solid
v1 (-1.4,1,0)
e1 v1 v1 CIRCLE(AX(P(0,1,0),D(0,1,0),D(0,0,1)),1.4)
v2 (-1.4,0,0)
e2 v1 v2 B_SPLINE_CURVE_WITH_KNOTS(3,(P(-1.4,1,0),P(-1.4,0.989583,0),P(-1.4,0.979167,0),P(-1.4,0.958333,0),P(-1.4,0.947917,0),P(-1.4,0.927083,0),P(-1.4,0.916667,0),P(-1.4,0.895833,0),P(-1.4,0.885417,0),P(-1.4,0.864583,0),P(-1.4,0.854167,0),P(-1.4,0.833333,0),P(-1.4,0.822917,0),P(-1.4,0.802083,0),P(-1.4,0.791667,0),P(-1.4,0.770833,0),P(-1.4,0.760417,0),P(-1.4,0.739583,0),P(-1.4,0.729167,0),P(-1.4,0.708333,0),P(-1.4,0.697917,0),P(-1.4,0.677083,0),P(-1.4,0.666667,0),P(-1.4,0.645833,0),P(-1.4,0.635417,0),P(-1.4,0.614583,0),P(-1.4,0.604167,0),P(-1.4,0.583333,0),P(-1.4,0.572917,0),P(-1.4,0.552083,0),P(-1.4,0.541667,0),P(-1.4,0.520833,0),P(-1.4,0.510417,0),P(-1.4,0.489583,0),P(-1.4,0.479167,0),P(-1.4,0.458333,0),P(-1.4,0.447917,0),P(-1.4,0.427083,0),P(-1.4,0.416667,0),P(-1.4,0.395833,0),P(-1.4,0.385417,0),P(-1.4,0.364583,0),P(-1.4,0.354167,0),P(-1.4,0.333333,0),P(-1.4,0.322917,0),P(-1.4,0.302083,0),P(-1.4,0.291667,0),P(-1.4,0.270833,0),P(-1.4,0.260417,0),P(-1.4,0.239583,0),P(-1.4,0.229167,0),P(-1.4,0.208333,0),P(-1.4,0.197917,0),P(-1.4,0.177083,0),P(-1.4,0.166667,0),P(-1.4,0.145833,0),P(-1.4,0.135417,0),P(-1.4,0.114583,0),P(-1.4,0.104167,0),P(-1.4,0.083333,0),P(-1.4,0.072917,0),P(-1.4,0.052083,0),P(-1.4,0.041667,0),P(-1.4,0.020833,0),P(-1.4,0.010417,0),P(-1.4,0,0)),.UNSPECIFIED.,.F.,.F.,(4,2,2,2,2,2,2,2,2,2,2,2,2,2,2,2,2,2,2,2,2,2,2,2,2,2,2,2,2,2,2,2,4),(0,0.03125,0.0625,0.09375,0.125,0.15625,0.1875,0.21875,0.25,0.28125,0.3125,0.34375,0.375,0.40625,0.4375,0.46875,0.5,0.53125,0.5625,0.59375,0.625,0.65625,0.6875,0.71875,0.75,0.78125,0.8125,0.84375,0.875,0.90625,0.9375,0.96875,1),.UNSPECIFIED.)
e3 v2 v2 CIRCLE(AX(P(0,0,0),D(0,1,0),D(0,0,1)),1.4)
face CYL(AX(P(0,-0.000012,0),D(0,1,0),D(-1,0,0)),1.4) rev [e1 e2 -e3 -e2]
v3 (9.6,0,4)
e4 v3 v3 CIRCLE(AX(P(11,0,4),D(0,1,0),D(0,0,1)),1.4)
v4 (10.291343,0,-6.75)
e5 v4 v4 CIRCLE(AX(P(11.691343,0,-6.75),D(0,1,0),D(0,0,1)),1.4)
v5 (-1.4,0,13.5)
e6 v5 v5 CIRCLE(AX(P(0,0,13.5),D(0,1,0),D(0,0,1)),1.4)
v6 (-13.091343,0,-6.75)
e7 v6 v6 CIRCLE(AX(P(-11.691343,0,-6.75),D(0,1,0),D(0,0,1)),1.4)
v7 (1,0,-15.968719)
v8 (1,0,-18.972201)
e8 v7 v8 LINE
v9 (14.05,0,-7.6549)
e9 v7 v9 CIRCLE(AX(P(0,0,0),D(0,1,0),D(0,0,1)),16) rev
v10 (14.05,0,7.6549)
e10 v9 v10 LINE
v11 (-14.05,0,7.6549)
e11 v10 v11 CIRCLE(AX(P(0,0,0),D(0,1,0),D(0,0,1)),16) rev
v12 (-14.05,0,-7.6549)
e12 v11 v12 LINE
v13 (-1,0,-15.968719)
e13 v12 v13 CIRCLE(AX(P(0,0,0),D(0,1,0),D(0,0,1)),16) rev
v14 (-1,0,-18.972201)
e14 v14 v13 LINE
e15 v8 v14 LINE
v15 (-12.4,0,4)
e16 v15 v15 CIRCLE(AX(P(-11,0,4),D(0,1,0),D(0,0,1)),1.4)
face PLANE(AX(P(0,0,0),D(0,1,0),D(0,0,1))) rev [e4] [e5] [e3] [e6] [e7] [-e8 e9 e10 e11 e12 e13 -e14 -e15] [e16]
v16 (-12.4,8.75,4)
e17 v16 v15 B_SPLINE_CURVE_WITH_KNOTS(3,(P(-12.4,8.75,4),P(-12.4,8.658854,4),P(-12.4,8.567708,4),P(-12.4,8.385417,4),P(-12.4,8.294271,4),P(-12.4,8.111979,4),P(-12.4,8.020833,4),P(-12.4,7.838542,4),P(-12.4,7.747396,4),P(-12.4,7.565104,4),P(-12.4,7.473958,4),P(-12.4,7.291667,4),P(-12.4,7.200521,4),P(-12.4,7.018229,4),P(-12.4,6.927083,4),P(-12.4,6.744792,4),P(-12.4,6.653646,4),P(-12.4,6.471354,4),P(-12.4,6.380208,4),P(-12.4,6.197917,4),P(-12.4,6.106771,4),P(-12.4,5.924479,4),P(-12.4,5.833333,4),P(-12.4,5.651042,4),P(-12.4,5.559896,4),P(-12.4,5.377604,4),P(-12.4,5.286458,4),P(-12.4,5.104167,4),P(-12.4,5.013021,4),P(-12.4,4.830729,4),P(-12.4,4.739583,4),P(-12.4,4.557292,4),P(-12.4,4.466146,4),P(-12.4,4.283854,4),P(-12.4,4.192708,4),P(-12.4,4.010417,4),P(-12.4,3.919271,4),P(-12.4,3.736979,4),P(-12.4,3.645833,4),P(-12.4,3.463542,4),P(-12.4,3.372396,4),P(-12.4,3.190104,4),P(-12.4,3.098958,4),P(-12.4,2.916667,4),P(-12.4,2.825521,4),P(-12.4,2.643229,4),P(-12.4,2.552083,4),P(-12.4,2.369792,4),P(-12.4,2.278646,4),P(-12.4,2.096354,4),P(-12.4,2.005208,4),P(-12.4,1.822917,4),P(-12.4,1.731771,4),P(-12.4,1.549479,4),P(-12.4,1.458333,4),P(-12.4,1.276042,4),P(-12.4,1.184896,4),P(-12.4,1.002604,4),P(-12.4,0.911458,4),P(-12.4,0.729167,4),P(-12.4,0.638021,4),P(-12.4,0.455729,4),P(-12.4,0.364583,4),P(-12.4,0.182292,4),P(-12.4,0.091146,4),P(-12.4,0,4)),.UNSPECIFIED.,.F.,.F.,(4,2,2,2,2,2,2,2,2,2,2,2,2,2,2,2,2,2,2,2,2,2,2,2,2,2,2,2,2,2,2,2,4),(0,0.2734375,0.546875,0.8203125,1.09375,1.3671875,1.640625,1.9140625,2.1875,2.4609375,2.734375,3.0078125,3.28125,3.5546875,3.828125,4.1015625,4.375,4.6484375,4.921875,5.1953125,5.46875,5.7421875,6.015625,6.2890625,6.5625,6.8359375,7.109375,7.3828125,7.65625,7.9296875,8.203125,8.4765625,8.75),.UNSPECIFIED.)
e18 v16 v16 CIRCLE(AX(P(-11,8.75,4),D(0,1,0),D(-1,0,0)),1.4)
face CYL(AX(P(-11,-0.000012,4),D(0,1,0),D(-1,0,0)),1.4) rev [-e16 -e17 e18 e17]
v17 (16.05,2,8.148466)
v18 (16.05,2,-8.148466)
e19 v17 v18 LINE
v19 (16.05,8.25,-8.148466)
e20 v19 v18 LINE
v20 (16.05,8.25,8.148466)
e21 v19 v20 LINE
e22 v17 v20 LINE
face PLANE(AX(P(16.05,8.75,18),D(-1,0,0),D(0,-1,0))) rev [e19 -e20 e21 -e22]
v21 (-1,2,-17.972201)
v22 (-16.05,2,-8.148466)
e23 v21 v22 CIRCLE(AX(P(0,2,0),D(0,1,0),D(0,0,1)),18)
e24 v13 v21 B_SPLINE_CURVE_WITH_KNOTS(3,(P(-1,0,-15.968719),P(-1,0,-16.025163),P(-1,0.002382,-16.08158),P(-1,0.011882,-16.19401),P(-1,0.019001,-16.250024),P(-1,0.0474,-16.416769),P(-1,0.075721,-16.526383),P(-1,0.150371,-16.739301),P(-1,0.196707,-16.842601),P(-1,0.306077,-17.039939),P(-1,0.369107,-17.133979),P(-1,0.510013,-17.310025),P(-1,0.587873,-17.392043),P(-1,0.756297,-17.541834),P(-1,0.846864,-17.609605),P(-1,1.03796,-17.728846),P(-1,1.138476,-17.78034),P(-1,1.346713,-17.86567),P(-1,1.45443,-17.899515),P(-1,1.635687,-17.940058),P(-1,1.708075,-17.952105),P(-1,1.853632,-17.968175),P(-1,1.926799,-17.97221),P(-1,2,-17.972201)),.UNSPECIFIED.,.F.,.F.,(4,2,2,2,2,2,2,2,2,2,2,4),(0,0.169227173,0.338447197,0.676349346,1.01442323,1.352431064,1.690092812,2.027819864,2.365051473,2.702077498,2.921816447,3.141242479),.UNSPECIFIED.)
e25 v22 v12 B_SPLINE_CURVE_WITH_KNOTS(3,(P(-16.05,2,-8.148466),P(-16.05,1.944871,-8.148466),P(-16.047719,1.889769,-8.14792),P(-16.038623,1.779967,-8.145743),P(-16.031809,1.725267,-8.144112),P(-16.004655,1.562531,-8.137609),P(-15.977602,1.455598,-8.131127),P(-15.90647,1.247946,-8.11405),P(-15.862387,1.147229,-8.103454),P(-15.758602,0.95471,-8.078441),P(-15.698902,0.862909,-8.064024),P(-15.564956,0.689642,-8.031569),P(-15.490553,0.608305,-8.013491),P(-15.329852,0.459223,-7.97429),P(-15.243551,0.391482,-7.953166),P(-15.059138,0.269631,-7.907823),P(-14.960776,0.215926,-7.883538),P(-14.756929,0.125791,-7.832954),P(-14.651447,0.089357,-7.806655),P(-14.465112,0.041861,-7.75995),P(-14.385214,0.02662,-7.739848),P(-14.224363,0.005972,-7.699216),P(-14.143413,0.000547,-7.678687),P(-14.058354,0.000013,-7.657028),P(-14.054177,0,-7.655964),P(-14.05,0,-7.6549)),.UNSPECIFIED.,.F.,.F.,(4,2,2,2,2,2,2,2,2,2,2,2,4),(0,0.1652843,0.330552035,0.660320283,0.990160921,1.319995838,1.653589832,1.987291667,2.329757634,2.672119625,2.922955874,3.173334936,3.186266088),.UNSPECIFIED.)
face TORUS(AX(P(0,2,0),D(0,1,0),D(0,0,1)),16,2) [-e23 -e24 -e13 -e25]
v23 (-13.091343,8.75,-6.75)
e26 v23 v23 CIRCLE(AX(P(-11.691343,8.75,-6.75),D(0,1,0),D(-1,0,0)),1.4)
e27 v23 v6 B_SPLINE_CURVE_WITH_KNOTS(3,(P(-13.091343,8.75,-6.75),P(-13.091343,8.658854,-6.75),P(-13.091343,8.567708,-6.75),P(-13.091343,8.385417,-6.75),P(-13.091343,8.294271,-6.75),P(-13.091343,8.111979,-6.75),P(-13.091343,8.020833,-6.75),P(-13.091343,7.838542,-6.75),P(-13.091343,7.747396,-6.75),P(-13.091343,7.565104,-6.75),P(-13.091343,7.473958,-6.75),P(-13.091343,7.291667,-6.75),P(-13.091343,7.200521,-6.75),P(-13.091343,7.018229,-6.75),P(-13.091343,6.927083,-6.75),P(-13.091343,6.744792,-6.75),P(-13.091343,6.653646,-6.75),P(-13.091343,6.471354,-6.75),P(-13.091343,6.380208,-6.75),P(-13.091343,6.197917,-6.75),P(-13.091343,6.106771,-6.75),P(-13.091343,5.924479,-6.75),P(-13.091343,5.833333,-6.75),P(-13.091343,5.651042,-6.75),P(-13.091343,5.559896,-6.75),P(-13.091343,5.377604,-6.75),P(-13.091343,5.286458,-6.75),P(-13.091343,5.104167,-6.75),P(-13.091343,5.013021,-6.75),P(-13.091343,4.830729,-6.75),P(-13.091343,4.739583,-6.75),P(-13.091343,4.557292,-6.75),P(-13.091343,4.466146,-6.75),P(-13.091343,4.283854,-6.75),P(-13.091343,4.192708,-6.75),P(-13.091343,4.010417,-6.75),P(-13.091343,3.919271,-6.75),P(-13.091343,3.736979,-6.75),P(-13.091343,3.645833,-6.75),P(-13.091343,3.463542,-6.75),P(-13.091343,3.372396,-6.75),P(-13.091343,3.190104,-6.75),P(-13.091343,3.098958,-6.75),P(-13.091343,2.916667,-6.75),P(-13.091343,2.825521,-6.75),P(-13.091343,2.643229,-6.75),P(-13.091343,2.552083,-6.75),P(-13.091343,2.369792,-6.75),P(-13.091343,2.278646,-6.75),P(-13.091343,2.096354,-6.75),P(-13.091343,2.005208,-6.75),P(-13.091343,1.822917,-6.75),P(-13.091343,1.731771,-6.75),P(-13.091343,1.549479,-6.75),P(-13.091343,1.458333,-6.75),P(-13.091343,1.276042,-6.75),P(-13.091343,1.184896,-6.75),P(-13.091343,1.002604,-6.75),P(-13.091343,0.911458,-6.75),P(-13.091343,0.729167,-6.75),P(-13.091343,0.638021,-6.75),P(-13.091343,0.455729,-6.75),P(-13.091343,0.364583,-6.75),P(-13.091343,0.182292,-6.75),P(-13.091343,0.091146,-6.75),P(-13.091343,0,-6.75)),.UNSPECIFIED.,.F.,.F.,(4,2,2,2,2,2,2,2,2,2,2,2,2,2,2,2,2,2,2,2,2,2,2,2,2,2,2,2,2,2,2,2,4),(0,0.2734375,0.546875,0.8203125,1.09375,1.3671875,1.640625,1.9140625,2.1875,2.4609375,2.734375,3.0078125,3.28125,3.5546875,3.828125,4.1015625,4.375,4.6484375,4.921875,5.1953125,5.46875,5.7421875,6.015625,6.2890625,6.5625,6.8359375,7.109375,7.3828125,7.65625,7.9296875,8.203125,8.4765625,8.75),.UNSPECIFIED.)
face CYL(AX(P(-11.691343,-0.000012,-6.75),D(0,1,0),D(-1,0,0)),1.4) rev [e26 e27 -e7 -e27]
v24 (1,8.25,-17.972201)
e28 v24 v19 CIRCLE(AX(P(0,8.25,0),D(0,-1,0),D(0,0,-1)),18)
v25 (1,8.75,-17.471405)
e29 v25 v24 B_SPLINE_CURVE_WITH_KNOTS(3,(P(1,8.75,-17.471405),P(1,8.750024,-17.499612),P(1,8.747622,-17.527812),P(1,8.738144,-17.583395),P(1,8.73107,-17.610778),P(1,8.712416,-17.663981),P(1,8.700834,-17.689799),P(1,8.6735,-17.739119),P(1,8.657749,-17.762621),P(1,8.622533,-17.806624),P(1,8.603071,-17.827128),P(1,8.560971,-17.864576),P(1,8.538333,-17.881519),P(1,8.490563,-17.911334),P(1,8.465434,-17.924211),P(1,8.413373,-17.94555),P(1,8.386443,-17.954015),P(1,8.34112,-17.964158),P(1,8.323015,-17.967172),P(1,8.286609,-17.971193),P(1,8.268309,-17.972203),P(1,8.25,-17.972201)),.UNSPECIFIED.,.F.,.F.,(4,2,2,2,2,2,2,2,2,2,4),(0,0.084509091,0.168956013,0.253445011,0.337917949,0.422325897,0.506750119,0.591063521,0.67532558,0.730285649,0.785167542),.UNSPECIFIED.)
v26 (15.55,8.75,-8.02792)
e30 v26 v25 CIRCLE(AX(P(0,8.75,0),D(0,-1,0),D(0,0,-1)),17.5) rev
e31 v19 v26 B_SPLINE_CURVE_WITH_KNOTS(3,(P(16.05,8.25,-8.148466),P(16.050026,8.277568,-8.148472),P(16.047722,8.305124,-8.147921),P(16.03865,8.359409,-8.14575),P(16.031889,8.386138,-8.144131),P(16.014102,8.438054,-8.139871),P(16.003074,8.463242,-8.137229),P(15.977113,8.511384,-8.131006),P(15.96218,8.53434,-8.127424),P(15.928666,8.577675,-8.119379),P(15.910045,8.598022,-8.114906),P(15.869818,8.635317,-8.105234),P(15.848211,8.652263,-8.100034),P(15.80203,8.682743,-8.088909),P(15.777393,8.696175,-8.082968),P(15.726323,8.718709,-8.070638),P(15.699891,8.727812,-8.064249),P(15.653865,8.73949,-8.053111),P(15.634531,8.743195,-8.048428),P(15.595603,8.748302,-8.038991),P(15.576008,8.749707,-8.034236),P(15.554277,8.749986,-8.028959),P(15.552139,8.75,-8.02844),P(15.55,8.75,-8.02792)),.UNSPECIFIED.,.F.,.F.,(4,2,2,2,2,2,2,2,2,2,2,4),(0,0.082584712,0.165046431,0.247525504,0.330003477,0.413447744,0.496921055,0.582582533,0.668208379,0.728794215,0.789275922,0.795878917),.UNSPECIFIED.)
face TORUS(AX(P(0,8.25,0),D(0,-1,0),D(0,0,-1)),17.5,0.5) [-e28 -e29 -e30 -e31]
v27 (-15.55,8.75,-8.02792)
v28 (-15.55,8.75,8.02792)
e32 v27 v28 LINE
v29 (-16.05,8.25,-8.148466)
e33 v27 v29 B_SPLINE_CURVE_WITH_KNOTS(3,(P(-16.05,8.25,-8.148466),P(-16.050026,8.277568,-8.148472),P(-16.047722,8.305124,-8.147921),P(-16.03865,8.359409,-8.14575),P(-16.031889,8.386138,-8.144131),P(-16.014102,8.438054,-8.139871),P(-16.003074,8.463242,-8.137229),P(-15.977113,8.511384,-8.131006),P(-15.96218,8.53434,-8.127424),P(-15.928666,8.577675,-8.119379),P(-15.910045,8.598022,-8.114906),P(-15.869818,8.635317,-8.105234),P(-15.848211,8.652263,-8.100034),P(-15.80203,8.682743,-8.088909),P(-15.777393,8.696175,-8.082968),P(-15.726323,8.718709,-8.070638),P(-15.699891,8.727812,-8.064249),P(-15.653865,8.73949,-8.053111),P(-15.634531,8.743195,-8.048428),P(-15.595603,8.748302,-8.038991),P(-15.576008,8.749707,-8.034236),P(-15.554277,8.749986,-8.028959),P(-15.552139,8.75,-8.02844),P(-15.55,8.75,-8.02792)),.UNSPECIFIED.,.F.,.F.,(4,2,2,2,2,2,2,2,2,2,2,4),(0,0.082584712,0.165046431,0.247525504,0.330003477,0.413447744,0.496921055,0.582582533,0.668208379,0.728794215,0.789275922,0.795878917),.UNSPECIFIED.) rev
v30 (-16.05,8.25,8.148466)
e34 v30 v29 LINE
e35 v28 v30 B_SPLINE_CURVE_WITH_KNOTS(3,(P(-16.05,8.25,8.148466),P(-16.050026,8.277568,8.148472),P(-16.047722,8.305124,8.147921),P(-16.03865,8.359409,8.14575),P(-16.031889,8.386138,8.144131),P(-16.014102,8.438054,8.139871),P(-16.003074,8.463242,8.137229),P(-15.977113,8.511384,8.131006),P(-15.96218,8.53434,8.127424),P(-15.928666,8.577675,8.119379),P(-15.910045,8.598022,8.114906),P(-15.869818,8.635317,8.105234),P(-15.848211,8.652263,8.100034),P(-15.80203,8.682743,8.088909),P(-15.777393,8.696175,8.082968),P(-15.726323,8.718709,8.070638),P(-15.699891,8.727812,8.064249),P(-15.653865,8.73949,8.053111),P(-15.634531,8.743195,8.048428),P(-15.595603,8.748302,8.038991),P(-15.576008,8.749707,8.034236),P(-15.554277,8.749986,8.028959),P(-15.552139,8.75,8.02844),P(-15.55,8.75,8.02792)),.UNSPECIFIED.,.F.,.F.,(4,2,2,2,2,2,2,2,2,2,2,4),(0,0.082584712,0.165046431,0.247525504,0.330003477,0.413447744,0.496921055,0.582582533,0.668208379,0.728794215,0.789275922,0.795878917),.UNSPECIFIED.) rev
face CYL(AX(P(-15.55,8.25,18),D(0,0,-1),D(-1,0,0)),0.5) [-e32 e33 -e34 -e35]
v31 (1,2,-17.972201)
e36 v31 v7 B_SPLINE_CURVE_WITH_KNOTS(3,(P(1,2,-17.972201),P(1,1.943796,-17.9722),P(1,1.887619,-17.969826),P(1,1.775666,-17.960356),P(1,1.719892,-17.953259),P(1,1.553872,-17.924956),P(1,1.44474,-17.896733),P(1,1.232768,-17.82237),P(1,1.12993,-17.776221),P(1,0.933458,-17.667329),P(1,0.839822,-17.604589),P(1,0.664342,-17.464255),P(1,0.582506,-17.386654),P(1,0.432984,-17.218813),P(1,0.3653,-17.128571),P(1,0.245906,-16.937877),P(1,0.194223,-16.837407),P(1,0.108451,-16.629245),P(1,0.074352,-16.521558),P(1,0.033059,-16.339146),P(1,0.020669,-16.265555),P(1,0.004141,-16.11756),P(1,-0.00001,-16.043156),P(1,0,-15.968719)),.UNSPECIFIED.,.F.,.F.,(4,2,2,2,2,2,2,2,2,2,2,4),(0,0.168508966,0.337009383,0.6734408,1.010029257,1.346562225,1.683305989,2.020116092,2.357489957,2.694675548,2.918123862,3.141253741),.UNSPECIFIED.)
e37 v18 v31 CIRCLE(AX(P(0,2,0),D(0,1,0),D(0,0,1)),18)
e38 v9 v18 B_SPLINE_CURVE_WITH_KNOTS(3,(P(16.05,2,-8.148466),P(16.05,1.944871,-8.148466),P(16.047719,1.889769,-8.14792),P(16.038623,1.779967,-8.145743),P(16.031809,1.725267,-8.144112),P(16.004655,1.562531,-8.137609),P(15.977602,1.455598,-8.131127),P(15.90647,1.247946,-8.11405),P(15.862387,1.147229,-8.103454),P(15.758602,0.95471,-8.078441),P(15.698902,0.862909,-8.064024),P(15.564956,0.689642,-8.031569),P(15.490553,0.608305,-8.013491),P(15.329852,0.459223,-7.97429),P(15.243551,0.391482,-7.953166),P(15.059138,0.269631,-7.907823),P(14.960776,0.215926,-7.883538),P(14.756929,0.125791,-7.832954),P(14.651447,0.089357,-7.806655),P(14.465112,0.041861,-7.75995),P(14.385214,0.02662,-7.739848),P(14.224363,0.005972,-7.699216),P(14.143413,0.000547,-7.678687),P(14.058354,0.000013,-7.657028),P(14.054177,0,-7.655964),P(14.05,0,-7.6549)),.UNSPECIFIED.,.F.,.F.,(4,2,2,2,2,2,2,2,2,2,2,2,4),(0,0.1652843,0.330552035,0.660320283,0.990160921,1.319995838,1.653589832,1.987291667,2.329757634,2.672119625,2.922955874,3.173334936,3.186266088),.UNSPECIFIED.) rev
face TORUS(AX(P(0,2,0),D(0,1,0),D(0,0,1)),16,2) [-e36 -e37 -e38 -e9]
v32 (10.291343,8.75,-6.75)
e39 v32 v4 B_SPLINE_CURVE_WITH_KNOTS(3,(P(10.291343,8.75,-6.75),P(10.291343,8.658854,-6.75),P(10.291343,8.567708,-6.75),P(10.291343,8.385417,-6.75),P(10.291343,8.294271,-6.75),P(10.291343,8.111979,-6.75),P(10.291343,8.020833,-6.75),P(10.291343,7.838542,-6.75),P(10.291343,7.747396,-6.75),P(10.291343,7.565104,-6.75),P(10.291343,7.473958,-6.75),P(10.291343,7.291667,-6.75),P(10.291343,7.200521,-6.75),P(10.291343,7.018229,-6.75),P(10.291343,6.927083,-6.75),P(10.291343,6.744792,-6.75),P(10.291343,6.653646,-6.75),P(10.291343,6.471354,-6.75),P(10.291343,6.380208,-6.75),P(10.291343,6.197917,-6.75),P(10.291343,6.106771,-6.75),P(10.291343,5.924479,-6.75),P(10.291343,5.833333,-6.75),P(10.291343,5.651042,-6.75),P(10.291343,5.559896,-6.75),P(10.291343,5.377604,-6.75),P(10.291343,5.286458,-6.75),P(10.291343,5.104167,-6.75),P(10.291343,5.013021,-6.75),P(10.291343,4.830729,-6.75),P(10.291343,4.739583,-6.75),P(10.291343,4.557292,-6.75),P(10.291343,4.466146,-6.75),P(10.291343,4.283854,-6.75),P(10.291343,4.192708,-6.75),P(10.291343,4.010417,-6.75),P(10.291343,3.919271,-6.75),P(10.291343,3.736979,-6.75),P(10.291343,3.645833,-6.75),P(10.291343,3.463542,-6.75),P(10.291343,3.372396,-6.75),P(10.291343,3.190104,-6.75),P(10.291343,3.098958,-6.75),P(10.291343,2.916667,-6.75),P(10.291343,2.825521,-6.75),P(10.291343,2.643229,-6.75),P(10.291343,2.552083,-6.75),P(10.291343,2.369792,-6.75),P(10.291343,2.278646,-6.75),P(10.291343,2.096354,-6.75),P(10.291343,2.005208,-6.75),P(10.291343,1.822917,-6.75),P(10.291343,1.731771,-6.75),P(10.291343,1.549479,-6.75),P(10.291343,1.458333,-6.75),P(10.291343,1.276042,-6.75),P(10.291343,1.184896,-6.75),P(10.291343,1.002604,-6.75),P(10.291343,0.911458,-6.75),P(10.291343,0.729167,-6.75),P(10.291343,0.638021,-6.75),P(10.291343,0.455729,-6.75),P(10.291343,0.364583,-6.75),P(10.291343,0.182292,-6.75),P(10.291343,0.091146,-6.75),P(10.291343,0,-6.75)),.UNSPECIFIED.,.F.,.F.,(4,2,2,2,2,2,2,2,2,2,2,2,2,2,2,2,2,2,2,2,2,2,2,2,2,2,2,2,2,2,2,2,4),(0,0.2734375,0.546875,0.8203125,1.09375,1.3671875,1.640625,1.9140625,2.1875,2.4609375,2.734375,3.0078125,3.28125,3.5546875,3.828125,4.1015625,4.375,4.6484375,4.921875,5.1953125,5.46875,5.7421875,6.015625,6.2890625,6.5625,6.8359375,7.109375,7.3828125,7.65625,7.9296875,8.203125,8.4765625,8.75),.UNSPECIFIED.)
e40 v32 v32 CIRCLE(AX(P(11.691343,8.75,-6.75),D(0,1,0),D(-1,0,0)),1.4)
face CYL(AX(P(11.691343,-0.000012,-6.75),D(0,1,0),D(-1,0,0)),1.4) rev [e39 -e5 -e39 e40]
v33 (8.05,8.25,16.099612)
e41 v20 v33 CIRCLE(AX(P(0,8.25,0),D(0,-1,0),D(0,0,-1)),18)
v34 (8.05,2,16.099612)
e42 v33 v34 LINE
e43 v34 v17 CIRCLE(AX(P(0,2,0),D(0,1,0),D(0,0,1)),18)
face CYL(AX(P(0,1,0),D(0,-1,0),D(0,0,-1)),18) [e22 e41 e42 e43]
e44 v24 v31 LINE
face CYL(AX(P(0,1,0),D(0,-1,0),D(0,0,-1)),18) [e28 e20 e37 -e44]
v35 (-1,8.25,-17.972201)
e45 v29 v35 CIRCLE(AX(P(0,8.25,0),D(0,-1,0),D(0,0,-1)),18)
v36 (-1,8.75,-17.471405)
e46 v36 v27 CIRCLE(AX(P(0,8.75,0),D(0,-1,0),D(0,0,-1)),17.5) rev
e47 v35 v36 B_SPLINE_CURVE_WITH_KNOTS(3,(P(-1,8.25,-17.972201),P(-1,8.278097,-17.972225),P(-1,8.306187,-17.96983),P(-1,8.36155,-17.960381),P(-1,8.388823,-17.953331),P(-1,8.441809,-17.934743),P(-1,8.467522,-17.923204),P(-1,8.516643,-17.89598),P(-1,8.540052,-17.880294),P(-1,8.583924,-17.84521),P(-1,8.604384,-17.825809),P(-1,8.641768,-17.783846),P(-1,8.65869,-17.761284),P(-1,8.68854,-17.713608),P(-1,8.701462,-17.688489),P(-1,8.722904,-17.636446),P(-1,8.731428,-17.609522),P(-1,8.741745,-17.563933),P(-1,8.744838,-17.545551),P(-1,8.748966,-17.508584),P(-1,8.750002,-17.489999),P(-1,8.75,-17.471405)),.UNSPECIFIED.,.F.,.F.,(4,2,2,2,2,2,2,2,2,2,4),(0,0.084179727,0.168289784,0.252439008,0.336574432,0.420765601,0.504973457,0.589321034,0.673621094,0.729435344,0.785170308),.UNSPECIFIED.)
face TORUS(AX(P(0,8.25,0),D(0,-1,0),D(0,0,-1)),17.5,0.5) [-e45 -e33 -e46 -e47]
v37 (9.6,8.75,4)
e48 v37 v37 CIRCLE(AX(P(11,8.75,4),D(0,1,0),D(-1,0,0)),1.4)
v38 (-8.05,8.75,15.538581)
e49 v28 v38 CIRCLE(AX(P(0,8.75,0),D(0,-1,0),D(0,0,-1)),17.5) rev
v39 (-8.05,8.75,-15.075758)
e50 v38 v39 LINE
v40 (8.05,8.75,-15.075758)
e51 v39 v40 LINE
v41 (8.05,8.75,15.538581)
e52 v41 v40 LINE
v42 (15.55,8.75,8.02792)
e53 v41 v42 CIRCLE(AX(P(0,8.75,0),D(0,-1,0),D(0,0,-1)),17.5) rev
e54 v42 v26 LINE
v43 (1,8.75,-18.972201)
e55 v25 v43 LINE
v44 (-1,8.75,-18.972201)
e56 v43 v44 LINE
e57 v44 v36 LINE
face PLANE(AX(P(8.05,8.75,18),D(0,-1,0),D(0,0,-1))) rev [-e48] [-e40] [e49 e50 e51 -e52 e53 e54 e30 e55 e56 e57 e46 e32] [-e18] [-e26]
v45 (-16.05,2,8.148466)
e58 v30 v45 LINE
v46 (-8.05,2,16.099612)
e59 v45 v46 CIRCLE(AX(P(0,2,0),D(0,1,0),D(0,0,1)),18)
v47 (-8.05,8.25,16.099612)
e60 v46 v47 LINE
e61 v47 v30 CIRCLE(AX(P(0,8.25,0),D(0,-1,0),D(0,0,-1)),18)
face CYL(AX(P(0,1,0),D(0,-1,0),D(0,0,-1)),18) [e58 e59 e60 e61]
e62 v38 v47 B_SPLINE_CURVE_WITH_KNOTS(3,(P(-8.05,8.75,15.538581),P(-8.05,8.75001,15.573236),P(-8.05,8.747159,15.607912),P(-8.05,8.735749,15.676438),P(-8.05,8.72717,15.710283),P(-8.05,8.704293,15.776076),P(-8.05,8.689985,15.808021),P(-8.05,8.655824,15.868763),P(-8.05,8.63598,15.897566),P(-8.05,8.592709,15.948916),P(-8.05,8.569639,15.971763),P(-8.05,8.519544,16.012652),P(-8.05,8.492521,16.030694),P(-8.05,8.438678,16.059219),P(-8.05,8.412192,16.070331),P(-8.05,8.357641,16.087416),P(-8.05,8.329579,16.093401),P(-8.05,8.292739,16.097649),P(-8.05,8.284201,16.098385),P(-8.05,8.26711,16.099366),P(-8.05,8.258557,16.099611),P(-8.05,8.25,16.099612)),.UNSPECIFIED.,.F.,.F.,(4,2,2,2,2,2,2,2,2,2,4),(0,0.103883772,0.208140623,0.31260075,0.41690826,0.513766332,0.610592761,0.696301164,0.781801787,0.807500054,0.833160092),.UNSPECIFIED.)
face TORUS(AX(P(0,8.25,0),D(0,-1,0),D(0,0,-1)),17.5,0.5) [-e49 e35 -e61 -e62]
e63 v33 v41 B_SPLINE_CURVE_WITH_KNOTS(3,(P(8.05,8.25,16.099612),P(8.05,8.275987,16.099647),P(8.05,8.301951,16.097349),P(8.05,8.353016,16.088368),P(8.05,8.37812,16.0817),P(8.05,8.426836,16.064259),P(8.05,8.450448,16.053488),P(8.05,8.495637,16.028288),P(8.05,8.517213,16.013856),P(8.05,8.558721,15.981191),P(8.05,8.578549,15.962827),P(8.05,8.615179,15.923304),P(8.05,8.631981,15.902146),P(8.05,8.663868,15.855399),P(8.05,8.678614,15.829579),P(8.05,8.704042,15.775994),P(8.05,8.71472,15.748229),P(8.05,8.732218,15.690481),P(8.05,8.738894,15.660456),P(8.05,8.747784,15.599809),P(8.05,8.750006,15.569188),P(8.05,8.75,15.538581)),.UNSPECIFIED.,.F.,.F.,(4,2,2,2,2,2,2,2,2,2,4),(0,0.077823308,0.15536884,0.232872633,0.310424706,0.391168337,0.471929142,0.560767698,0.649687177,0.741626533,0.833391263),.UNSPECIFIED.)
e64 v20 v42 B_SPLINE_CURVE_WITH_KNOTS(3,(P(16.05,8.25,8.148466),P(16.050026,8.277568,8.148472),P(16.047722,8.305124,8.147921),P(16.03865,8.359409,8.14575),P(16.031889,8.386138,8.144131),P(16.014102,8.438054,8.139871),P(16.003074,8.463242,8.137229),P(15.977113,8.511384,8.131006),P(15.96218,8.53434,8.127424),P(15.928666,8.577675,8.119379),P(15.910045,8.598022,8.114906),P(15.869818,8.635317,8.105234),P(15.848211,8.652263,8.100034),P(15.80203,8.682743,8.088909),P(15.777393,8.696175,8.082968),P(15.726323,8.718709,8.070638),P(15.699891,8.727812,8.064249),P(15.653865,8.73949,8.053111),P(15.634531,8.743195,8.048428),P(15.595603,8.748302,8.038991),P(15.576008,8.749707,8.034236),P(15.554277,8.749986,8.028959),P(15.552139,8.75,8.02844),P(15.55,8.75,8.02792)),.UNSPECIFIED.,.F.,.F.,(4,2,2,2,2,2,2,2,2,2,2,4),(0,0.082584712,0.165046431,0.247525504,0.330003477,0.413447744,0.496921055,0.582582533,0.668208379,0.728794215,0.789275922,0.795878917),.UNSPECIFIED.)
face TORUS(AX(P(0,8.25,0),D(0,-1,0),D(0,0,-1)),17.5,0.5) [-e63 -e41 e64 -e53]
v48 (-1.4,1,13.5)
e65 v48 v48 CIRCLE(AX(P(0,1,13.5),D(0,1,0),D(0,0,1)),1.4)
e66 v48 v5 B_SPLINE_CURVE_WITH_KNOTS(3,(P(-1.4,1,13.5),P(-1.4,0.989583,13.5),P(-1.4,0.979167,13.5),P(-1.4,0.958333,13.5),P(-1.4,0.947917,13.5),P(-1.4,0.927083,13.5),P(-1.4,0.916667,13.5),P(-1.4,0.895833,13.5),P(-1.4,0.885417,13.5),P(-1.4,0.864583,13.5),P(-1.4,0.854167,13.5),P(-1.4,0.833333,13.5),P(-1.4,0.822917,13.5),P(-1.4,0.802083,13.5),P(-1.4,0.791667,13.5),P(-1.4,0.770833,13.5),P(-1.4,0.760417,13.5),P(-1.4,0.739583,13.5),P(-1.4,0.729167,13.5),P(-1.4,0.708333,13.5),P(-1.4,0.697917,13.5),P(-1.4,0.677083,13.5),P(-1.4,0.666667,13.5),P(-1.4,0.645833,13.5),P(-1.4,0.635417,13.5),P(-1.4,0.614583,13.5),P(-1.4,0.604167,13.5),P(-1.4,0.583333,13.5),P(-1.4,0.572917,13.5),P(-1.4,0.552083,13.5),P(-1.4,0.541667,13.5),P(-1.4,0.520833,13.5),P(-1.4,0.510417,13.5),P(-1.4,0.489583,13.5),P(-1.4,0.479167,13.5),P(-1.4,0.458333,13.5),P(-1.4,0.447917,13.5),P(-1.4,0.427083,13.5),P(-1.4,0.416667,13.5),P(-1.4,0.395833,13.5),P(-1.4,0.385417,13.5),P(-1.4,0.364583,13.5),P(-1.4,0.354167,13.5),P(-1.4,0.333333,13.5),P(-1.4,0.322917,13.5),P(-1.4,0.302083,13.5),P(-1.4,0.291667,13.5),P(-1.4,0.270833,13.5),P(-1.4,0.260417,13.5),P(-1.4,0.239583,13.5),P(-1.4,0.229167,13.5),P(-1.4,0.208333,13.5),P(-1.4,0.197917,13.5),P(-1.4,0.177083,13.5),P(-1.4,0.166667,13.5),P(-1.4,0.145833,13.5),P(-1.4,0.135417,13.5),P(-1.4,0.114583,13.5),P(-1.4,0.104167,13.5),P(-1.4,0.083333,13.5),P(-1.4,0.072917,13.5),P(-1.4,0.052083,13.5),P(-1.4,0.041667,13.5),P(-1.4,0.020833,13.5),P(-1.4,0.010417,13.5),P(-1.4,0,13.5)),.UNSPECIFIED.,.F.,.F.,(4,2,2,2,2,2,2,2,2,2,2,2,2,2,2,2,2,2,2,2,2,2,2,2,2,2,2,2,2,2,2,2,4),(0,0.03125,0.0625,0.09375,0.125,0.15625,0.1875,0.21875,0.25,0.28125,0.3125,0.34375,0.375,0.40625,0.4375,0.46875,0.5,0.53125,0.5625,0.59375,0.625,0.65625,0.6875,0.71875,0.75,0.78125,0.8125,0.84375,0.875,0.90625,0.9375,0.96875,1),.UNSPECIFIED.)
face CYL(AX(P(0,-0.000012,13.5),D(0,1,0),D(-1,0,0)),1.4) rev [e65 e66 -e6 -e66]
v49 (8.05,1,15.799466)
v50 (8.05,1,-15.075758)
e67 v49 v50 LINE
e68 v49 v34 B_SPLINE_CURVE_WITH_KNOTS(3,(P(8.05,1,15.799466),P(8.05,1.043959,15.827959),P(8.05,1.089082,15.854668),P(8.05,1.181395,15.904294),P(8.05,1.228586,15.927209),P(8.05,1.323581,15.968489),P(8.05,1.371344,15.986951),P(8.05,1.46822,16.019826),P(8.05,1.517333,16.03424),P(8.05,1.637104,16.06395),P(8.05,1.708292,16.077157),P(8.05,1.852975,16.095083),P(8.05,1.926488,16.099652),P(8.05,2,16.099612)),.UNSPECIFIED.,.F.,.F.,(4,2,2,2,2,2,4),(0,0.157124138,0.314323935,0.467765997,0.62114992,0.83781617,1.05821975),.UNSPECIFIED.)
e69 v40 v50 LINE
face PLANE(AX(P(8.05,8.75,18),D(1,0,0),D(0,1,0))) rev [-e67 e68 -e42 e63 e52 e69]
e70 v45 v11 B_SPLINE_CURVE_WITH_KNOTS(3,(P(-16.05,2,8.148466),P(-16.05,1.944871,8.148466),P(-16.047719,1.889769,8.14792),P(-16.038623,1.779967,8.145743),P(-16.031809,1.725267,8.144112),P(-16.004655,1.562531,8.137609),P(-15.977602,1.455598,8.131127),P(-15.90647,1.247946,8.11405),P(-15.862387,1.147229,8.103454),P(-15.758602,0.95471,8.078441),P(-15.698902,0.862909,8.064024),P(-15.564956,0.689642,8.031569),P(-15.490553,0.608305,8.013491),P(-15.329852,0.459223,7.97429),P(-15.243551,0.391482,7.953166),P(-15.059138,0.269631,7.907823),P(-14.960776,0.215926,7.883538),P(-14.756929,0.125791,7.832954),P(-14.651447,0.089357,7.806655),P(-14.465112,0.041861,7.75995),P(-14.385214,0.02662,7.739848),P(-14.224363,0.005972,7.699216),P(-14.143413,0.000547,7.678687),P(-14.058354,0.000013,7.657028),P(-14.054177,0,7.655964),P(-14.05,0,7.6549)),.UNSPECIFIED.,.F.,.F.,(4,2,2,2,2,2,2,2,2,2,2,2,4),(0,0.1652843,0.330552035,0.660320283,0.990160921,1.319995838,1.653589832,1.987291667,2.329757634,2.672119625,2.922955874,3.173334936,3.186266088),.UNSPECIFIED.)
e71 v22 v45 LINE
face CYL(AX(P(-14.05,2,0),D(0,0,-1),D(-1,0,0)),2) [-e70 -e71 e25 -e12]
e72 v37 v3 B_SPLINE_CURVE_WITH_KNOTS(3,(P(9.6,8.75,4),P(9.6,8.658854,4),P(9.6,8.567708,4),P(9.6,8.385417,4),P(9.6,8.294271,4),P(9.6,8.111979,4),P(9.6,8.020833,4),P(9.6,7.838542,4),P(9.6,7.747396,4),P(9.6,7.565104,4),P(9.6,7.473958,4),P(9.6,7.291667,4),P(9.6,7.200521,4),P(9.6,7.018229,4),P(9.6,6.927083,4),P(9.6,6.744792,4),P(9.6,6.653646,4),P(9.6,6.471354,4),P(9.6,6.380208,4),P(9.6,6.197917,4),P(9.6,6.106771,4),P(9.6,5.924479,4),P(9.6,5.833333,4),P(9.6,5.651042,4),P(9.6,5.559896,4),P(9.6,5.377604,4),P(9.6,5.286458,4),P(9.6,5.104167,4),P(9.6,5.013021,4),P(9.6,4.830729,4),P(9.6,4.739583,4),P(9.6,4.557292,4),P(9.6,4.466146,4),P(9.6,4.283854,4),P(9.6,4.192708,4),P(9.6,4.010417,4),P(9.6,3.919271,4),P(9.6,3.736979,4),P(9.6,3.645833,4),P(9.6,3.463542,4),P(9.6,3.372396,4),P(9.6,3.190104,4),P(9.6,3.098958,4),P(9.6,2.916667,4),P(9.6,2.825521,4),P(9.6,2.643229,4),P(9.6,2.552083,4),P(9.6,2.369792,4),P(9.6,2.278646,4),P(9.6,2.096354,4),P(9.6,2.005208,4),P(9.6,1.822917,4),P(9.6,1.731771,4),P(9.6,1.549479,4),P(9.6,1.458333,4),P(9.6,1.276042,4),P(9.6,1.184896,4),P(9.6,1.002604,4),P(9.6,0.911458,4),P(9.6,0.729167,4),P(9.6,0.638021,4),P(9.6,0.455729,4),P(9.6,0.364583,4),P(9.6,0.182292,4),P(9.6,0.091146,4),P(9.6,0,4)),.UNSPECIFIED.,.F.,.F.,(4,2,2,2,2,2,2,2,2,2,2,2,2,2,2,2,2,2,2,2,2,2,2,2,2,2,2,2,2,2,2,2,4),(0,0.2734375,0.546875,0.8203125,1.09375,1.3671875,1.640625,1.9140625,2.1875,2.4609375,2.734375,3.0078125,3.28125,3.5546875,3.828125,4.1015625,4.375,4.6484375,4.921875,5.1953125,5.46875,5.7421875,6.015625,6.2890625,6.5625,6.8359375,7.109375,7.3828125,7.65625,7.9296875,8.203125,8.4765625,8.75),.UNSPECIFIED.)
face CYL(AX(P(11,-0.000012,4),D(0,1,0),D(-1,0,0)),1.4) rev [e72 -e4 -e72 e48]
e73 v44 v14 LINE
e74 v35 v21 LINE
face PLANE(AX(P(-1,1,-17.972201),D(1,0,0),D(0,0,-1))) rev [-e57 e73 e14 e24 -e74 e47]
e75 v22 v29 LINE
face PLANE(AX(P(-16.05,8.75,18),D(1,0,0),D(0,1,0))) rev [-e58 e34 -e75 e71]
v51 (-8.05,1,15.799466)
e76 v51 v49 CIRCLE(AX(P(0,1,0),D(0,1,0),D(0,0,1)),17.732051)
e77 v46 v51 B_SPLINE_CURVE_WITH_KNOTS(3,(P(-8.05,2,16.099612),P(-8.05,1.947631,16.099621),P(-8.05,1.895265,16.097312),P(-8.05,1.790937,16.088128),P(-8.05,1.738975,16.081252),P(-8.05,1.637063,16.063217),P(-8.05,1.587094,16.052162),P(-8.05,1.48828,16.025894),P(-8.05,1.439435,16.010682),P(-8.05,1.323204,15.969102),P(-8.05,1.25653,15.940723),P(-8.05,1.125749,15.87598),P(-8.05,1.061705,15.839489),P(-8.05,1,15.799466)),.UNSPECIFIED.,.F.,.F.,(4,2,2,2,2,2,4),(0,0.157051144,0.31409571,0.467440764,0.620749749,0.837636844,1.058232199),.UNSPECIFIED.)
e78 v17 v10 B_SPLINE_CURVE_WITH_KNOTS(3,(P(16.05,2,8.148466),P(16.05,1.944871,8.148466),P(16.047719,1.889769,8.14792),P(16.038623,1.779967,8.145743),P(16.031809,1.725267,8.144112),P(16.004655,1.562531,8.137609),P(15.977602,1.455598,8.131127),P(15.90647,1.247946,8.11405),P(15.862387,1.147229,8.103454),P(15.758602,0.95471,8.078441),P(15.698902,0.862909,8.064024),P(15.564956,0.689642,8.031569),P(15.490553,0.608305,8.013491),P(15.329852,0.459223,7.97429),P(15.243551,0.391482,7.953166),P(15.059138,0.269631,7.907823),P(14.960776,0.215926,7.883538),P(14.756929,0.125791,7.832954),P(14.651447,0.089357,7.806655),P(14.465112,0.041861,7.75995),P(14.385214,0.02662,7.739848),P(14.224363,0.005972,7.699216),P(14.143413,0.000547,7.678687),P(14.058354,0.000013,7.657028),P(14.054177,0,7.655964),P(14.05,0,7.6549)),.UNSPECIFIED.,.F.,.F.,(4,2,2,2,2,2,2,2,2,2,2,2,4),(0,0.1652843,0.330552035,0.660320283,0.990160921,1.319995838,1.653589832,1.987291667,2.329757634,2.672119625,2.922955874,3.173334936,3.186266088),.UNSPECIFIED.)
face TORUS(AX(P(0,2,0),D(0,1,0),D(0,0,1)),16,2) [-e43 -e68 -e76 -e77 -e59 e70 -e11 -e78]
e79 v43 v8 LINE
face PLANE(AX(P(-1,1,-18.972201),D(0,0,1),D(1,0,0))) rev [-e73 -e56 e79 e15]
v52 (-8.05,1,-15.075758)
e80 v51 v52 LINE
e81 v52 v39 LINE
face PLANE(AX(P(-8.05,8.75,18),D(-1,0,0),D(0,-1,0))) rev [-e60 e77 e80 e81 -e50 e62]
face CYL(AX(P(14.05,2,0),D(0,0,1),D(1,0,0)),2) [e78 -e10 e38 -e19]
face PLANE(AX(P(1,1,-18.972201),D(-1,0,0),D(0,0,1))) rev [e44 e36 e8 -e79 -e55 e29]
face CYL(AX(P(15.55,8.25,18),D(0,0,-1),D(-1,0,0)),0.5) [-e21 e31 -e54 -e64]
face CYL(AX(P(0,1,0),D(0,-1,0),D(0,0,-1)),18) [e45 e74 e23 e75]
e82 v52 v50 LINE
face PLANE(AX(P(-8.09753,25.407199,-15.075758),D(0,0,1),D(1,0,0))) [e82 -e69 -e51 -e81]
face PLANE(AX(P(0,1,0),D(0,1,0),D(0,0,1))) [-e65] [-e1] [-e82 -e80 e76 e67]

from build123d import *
from build123d.topology import SkipClean

# Parameters (mm, degrees)
BOSS_EXTRUDE1_DEPTH      = 1
BOSS_EXTRUDE2_DEPTH      = 18
BOSS_EXTRUDE2_DEPTH_BACK = 18.972201
SKETCH2_W                = 8
SKETCH2_H                = 7.75
SKETCH3_R                = 59.910539196
CUT_EXTRUDE1_DEPTH       = 28.577289765
CUT_EXTRUDE2_DEPTH       = 28.577289597
CUT_EXTRUDE2_DEPTH_BACK  = 28.577289597
SKETCH5_R                = 1.4
BOSS_EXTRUDE3_DEPTH      = 8.75
CUT_EXTRUDE3_DEPTH       = 28.276489905
FILLET1_R                = 2
FILLET2_R                = 0.5


with BuildPart() as part:
    # Sketch1 → Boss-Extrude1 (new body)
    with BuildSketch(Plane(origin=(0, 0, 0), x_dir=(1, 0, 0), z_dir=(0, 1, 0))):
        with BuildLine():
            Line((-1, 17.972200756), (-1, 18.972200756))
            Line((-1, 18.972200756), (1, 18.972200756))
            Line((1, 18.972200756), (1, 17.972200756))
            ThreePointArc((1, 17.972200756), (0, -18), (-1, 17.972200756))
        make_face()
    extrude(amount=BOSS_EXTRUDE1_DEPTH)

    # Sketch2 → Boss-Extrude2 (add, two sides: drawn at the far end of the back side and taken through both)
    with BuildSketch(Plane.XY.offset(-BOSS_EXTRUDE2_DEPTH_BACK)):
        with Locations((-12.05, 4.875)):
            Rectangle(SKETCH2_W, SKETCH2_H)
        with Locations((12.05, 4.875)):
            Rectangle(SKETCH2_W, SKETCH2_H)
    extrude(amount=BOSS_EXTRUDE2_DEPTH + BOSS_EXTRUDE2_DEPTH_BACK)

    # Sketch3 → Cut-Extrude1 (cut, through all)
    with BuildSketch(Plane.XZ):
        Circle(SKETCH3_R)
        with BuildLine():
            Line((-1, -17.972200756), (-1, -18.972200756))
            Line((-1, -18.972200756), (1, -18.972200756))
            Line((1, -18.972200756), (1, -17.972200756))
            ThreePointArc((1, -17.972200756), (0, 18), (-1, -17.972200756))
        make_face(mode=Mode.SUBTRACT)
    extrude(amount=-CUT_EXTRUDE1_DEPTH, mode=Mode.SUBTRACT)

    # Sketch5 → Cut-Extrude2 (cut, two sides: drawn at the far end of the back side and taken through both)
    with BuildSketch(Plane(origin=(0, 0, 0), x_dir=(1, 0, 0), z_dir=(0, 1, 0)).offset(-CUT_EXTRUDE2_DEPTH_BACK)):
        with Locations(Location((0, 0, 0), (0, 0, 180))):
            Circle(SKETCH5_R)
        with Locations(Location((11, -4, 0), (0, 0, 180))):
            Circle(SKETCH5_R)
        with Locations(Location((-11, -4, 0), (0, 0, 180))):
            Circle(SKETCH5_R)
        with Locations(Location((-11.691342951, 6.75, 0), (0, 0, 180))):
            Circle(SKETCH5_R)
        with Locations(Location((0, -13.5, 0), (0, 0, 180))):
            Circle(SKETCH5_R)
        with Locations(Location((11.691342951, 6.75, 0), (0, 0, 180))):
            Circle(SKETCH5_R)
    extrude(amount=CUT_EXTRUDE2_DEPTH + CUT_EXTRUDE2_DEPTH_BACK, mode=Mode.SUBTRACT)

    # Sketch6 → Boss-Extrude3 (add)
    with SkipClean():  # the faces are left unmerged after this step: merging them gives an invalid solid
        with BuildSketch(Plane.XZ):
            with BuildLine():
                Line((-8.097530488, -15.075758147), (8.097530488, -15.075758147))
                Line((8.097530488, -15.075758147), (8.097530488, -16.075758147))
                ThreePointArc((8.097530488, -16.075758147), (4.646545909, -17.389928439), (1, -17.972200756))
                Line((1, -17.972200756), (1, -18.972200756))
                Line((1, -18.972200756), (-1, -18.972200756))
                Line((-1, -18.972200756), (-1, -17.972200756))
                ThreePointArc((-1, -17.972200756), (-4.646545909, -17.389928439), (-8.097530488, -16.075758147))
                Line((-8.097530488, -16.075758147), (-8.097530488, -15.075758147))
            make_face()
        extrude(amount=-BOSS_EXTRUDE3_DEPTH)
    add(part.part.scale(1), mode=Mode.REPLACE)  # the faces are merged on a copy

    # Sketch7 → Cut-Extrude3 (cut, through all)
    with BuildSketch(Plane(origin=(0, 1, 0), x_dir=(1, 0, 0), z_dir=(0, 1, 0))):
        with BuildLine():
            Line((16.05, 8.148466113), (16.05, -8.148466113))
            ThreePointArc((16.05, -8.148466113), (18, 0), (16.05, 8.148466113))
        make_face()
        with BuildLine():
            Line((-16.05, -8.148466113), (-16.05, 8.148466113))
            ThreePointArc((-16.05, 8.148466113), (-18, 0), (-16.05, -8.148466113))
        make_face()
    extrude(amount=-CUT_EXTRUDE3_DEPTH, mode=Mode.SUBTRACT)

    # Fillet1
    # the kernel refuses this fillet: 2 mm, written as the material it takes off along each edge
    with BuildSketch(Plane(origin=(16.05, 0, 13.148466113), x_dir=(-1, 0, 0), z_dir=(0, 0, -1)), Plane(origin=(-16.05, 0, -13.148466113), x_dir=(1, 0, 0), z_dir=(0, 0, 1))) as fillet1_piece_1:
        with BuildLine():
            CenterArc((FILLET1_R, FILLET1_R), FILLET1_R, 180, 90)
            Line((0, FILLET1_R), (0, 0))
            Line((0, 0), (FILLET1_R, 0))
        make_face()
    extrude(amount=26.296932227, mode=Mode.SUBTRACT)
    with BuildSketch(Plane(origin=(0, 0, 0), x_dir=(0.9816654427410076, 0, 0.19061206291339847), z_dir=(0.19061206291339847, 0, -0.9816654427410076))) as fillet1_piece_2:
        with BuildLine():
            CenterArc((18 - FILLET1_R, -FILLET1_R), FILLET1_R, 0, 90)
            Line((18, -FILLET1_R), (18, 0))
            Line((18, 0), (18 - FILLET1_R, 0))
        make_face()
    revolve(axis=Axis((0, 0, 0), (0, -1, 0)), revolution_arc=158.022988726, mode=Mode.SUBTRACT)
    with BuildSketch(Plane(origin=(0, 0, 0), x_dir=(0.4498628048748618, 0, -0.8930976748318865), z_dir=(-0.8930976748318865, 0, -0.4498628048748618))) as fillet1_piece_3:
        with BuildLine():
            CenterArc((18 - FILLET1_R, -FILLET1_R), FILLET1_R, 0, 90)
            Line((18, -FILLET1_R), (18, 0))
            Line((18, 0), (18 - FILLET1_R, 0))
        make_face()
    revolve(axis=Axis((0, 0, 0), (0, -1, 0)), revolution_arc=52.265087313, mode=Mode.SUBTRACT)
    with BuildSketch(Plane(origin=(0, 0, 0), x_dir=(-0.9816270812345659, 0, -0.19080952121659656), z_dir=(-0.19080952121659656, 0, 0.9816270812345659))) as fillet1_piece_4:
        with BuildLine():
            CenterArc((18 - FILLET1_R, -FILLET1_R), FILLET1_R, 0, 90)
            Line((18 - FILLET1_R, 0), (18, 0))
            Line((18, 0), (18, -FILLET1_R))
        make_face()
    revolve(axis=Axis((0, 0, 0), (0, -1, 0)), revolution_arc=52.265087313, mode=Mode.SUBTRACT)
    with BuildSketch(Plane(origin=(0, 0, 0), x_dir=(-0.44986280487485913, 0, -0.8930976748318878), z_dir=(-0.8930976748318878, 0, 0.44986280487485913))) as fillet1_piece_5_section:
        with BuildLine():
            CenterArc((18 - FILLET1_R, -FILLET1_R), FILLET1_R, 0, 90)
            Line((18 - FILLET1_R, 0), (18, 0))
            Line((18, 0), (18, -FILLET1_R))
        make_face()
    fillet1_piece_5 = revolve(axis=Axis((0, 0, 0), (0, -1, 0)), revolution_arc=39.46607541, mode=Mode.PRIVATE)
    fillet1_piece_5 = split(fillet1_piece_5, bisect_by=Plane(origin=(-1, 0.459921415, -16.842636156), z_dir=(-1, 0, 0)), keep=Keep.TOP, mode=Mode.PRIVATE)
    add(fillet1_piece_5, mode=Mode.SUBTRACT)
    with BuildSketch(Plane(origin=(0, 0, 0), x_dir=(-0.44986280487485913, 0, -0.8930976748318878), z_dir=(-0.8930976748318878, 0, 0.44986280487485913))) as fillet1_piece_6_section:
        with BuildLine():
            CenterArc((18 - FILLET1_R, -FILLET1_R), FILLET1_R, 0, 90)
            Line((18 - FILLET1_R, 0), (18, 0))
            Line((18, 0), (18, -FILLET1_R))
        make_face()
    fillet1_piece_6 = revolve(axis=Axis((0, 0, 0), (0, -1, 0)), revolution_arc=39.46607541, mode=Mode.PRIVATE)
    fillet1_piece_6 = split(fillet1_piece_6, bisect_by=Plane(origin=(1, 0.461212135, -17.370872929), z_dir=(1, 0, 0)), keep=Keep.TOP, mode=Mode.PRIVATE)
    add(fillet1_piece_6, mode=Mode.SUBTRACT)
    with BuildSketch(Plane(origin=(0, 0, 0), x_dir=(-0.22037727986092012, 0, -0.9754147089936167), z_dir=(-0.9754147089936167, 0, 0.22037727986092012))) as fillet1_piece_7_section:
        with BuildLine():
            CenterArc((18 - FILLET1_R, -FILLET1_R), FILLET1_R, 0, 90)
            Line((18, -FILLET1_R), (18, 0))
            Line((18, 0), (18 - FILLET1_R, 0))
        make_face()
    fillet1_piece_7 = revolve(axis=Axis((0, 0, 0), (0, -1, 0)), revolution_arc=39.46607541, mode=Mode.PRIVATE)
    fillet1_piece_7 = split(fillet1_piece_7, bisect_by=Plane(origin=(-1, 0.461212076, -17.370872697), z_dir=(-1, 0, 0)), keep=Keep.TOP, mode=Mode.PRIVATE)
    add(fillet1_piece_7, mode=Mode.SUBTRACT)
    with BuildSketch(Plane(origin=(0, 0, 0), x_dir=(-0.22037727986092012, 0, -0.9754147089936167), z_dir=(-0.9754147089936167, 0, 0.22037727986092012))) as fillet1_piece_8_section:
        with BuildLine():
            CenterArc((18 - FILLET1_R, -FILLET1_R), FILLET1_R, 0, 90)
            Line((18, -FILLET1_R), (18, 0))
            Line((18, 0), (18 - FILLET1_R, 0))
        make_face()
    fillet1_piece_8 = revolve(axis=Axis((0, 0, 0), (0, -1, 0)), revolution_arc=39.46607541, mode=Mode.PRIVATE)
    fillet1_piece_8 = split(fillet1_piece_8, bisect_by=Plane(origin=(1, 0.459921447, -16.842636316), z_dir=(1, 0, 0)), keep=Keep.TOP, mode=Mode.PRIVATE)
    add(fillet1_piece_8, mode=Mode.SUBTRACT)

    # Fillet2
    fillet2_edges = [part.edges().sort_by_distance(p)[0] for p in [
        (16.05, 8.75, 0),
        (-16.05, 8.75, 0),
        (-12.688880148, 8.75, 12.766844582),
        (-12.707725875, 8.75, -12.748086252),
        (12.688880148, 8.75, 12.766844582),
        (12.707725875, 8.75, -12.748086252),
    ]]
    fillet(fillet2_edges, radius=FILLET2_R)


solid = part.part
